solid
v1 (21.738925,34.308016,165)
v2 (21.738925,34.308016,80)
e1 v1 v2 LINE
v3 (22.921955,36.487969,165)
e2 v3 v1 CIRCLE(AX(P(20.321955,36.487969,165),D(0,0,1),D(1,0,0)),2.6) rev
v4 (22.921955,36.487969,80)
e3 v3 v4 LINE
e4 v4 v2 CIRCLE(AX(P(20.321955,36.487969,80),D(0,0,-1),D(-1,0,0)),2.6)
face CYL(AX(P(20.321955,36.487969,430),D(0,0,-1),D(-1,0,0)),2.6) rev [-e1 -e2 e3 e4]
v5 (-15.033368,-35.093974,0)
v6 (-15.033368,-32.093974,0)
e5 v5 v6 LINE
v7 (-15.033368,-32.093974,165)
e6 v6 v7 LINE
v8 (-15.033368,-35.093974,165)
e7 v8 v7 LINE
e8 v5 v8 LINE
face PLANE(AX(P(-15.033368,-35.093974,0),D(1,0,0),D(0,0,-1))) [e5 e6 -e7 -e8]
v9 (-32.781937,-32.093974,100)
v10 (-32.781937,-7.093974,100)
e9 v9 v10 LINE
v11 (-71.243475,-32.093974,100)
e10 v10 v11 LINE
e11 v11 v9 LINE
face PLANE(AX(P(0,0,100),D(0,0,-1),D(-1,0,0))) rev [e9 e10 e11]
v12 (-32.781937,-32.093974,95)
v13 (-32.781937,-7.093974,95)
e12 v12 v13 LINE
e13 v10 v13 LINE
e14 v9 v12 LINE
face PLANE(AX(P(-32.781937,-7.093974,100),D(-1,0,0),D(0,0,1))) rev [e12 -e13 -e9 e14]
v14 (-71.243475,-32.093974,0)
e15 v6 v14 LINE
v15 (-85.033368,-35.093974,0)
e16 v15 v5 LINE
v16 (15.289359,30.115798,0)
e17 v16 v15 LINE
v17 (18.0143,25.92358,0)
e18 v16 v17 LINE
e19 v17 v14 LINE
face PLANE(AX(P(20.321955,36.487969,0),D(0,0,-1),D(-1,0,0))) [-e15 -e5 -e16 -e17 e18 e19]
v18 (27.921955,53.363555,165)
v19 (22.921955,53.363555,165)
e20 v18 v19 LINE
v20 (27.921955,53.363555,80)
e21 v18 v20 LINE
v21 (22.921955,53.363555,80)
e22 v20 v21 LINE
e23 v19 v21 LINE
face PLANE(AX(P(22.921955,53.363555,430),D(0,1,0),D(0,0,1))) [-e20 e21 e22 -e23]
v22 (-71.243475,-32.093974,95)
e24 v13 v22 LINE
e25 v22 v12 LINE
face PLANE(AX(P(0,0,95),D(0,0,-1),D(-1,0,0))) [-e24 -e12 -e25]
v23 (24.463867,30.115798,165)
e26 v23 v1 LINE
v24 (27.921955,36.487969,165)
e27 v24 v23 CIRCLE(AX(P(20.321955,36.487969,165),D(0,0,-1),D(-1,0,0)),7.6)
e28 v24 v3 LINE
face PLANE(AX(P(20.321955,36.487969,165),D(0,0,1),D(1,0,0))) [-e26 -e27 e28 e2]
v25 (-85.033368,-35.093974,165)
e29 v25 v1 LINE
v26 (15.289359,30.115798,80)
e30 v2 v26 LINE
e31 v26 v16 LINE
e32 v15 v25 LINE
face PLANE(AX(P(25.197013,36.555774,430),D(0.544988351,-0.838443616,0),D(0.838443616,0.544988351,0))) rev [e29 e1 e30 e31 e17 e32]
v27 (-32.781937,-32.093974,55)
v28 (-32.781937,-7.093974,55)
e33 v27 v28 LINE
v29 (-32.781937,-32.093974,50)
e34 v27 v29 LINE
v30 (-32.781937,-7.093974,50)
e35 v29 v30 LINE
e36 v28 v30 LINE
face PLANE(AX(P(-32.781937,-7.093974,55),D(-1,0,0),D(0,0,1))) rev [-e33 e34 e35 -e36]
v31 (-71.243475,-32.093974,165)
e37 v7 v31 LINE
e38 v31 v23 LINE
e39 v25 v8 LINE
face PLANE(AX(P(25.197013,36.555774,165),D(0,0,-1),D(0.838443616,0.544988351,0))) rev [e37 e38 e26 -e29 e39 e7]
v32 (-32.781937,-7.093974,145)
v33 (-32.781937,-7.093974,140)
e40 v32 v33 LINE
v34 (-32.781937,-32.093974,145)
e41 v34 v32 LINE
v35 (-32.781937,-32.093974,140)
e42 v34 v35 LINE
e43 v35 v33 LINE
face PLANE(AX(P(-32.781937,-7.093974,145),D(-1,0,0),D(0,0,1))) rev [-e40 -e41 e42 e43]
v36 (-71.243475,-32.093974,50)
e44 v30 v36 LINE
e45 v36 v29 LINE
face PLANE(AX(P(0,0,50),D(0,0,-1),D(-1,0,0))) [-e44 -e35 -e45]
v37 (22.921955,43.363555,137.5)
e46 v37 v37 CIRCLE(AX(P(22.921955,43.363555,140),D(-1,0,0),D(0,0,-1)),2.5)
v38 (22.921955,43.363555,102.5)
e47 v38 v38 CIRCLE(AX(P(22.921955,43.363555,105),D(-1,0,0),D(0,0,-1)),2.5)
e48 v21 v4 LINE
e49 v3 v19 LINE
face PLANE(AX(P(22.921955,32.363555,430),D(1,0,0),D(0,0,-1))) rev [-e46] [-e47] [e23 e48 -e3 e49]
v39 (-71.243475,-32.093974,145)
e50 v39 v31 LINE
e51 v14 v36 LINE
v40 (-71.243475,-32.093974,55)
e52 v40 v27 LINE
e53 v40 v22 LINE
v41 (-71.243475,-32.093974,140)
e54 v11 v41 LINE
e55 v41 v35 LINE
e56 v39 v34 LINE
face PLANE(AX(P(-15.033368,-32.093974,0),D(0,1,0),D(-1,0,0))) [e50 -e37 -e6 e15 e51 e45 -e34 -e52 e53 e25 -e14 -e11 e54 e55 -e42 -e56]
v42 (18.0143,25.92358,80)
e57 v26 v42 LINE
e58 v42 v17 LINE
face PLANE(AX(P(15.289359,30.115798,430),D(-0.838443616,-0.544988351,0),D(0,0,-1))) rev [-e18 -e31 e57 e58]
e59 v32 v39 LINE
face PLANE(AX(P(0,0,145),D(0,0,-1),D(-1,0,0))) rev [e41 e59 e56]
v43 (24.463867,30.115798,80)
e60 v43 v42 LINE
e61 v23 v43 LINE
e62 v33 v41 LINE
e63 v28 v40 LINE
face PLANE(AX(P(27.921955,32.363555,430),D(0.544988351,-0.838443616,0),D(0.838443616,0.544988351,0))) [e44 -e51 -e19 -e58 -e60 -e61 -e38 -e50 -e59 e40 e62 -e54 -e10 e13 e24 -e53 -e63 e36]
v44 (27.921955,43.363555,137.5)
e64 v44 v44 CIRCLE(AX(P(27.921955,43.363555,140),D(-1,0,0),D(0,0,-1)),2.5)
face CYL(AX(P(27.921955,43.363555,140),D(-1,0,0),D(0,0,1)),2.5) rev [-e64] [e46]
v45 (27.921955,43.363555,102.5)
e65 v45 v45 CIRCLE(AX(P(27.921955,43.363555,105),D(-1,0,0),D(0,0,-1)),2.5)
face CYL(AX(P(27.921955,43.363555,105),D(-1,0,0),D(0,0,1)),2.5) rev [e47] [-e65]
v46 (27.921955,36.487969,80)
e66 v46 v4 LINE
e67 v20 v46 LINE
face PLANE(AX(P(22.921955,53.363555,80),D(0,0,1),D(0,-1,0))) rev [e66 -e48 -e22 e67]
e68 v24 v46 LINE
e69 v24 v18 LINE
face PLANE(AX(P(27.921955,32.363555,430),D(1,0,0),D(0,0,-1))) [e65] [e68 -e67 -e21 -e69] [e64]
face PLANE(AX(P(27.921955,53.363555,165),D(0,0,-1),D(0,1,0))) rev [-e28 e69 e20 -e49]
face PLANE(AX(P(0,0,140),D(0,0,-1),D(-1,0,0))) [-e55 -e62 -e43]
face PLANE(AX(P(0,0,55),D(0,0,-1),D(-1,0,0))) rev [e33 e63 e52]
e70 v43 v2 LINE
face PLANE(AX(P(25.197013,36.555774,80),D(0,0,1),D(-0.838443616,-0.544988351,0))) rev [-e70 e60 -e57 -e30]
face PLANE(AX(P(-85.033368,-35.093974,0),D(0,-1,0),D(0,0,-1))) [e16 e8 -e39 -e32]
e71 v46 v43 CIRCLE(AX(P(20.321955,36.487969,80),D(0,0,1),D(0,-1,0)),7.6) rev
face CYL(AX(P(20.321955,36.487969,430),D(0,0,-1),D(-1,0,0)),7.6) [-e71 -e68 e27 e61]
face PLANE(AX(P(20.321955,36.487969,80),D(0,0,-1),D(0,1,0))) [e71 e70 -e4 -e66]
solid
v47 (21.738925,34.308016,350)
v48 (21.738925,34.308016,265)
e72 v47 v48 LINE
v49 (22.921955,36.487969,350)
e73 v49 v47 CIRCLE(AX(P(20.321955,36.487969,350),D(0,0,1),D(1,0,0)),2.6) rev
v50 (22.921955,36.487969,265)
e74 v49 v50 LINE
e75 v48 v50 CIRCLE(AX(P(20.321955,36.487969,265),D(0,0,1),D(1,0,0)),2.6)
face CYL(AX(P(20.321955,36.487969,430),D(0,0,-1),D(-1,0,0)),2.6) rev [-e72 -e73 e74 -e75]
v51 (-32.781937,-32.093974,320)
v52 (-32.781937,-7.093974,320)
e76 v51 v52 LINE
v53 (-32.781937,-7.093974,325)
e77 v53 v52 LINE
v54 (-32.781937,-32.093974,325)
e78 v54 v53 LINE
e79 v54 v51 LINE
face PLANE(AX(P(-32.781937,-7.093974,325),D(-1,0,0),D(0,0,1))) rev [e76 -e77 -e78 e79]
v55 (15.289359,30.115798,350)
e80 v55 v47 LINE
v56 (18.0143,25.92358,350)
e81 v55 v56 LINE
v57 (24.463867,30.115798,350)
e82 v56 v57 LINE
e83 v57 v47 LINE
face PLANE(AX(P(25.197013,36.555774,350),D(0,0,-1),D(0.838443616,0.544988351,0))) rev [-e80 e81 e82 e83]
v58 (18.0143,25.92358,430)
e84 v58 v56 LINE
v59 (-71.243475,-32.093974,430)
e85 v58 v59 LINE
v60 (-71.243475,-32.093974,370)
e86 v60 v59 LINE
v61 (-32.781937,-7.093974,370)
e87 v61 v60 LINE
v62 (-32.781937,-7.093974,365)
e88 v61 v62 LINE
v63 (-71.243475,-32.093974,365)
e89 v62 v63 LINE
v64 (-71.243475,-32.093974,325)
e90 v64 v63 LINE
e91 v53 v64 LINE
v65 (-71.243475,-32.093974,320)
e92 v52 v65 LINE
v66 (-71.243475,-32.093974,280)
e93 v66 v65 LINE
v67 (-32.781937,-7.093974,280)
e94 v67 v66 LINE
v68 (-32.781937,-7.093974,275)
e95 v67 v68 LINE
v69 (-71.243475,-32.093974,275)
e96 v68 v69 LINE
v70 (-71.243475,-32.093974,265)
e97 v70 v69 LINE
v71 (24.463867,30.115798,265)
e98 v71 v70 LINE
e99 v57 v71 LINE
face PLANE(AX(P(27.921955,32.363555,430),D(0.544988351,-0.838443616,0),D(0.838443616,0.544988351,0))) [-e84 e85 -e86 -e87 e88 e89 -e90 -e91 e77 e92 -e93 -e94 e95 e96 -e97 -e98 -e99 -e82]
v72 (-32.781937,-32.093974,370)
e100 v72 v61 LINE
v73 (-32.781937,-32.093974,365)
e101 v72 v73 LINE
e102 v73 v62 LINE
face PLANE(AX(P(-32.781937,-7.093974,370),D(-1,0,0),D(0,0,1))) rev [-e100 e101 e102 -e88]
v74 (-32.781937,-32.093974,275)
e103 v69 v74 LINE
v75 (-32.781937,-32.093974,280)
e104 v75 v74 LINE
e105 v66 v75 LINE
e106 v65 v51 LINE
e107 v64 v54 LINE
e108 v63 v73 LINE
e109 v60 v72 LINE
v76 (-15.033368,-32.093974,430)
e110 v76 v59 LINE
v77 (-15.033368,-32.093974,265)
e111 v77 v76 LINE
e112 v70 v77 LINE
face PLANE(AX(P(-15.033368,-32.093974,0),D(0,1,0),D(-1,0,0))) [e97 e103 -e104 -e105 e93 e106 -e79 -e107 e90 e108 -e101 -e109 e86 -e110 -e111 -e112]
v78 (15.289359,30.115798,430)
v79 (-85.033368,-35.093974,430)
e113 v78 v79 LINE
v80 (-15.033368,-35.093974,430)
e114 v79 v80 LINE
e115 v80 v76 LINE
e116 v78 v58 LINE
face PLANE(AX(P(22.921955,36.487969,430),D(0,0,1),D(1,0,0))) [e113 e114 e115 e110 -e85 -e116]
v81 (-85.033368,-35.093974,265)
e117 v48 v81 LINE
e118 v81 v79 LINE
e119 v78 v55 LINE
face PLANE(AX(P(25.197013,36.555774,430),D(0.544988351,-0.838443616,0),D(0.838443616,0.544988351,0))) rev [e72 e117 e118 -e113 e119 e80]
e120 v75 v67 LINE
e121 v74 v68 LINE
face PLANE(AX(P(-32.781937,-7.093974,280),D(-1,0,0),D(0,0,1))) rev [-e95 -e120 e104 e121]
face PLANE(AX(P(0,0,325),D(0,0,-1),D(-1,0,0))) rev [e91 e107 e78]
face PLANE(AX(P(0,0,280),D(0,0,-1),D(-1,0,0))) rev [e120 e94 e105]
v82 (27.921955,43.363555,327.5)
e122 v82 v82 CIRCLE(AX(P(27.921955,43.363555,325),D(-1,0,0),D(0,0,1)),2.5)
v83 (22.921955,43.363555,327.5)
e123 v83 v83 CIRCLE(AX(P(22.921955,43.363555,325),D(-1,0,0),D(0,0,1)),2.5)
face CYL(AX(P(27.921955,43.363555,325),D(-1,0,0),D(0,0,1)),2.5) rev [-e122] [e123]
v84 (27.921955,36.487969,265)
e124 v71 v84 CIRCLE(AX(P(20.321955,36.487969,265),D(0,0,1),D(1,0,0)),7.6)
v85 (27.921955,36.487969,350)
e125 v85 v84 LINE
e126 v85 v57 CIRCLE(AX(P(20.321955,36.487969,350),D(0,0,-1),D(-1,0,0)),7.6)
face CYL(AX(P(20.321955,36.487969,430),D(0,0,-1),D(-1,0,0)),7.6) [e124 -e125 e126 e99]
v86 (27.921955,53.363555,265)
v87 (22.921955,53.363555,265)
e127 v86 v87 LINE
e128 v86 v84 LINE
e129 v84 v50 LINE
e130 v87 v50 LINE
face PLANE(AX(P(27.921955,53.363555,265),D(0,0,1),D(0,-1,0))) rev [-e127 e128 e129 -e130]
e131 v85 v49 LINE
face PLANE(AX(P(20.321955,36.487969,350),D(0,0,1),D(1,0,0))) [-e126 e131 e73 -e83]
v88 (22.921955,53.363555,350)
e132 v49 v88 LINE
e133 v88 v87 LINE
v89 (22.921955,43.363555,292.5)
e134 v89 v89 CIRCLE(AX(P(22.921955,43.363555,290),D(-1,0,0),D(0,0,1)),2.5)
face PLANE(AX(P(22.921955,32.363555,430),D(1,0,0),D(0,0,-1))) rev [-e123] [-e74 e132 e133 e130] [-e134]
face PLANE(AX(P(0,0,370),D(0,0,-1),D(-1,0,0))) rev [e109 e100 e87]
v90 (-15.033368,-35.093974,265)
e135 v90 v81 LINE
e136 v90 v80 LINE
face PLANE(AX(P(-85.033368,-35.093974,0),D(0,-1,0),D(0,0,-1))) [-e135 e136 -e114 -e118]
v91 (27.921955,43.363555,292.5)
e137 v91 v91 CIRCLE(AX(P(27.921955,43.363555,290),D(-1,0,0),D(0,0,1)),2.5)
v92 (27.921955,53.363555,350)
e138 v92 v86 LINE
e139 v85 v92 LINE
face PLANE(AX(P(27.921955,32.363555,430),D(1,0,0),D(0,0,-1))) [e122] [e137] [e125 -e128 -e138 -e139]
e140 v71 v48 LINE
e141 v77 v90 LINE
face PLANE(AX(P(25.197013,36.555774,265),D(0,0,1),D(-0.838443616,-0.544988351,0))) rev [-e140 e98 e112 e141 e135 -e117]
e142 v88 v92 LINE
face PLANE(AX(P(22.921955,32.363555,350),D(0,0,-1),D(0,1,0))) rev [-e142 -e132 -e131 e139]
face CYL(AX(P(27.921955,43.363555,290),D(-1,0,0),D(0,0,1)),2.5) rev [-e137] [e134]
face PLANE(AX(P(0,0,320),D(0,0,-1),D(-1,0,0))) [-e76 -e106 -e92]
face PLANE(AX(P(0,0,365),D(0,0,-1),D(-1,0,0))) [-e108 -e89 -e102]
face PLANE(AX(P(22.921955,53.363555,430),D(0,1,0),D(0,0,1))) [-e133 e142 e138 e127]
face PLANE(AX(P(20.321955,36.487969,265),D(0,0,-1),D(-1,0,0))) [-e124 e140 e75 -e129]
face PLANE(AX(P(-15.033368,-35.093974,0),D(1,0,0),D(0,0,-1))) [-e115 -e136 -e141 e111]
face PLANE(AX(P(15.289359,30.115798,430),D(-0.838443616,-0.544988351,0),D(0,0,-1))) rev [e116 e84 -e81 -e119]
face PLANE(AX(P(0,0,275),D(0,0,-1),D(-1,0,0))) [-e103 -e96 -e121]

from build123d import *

# Parameters (mm, degrees)
BASE_FLANGE2_DEPTH   = 430
CUT_EXTRUDE1_START   = 165
CUT_EXTRUDE1_DEPTH   = 100
CUT_EXTRUDE1_2_DEPTH = 80
CUT_EXTRUDE1_START_2 = 350
CUT_EXTRUDE1_3_DEPTH = 80
BOSS_EXTRUDE2_DEPTH  = 430
BOSS_EXTRUDE3_START  = 50
BOSS_EXTRUDE3_DEPTH  = 5
LPATTERN1_COUNT      = 8
LPATTERN1_PITCH      = 45
SKETCH13_R           = 2.5
CUT_EXTRUDE2_DEPTH   = 5
SKETCH14_W           = 88.914799092
SKETCH14_H           = 100
CUT_EXTRUDE3_DEPTH   = 440.40419449


# Read off the part's stored shape, not the designer's step: Cut-Extrude1
# Sheet-metal steps are written as plain solids
with BuildPart() as part:
    # Sketch1 → Base-Flange2 (new body)
    with BuildSketch(Plane.XY):
        with BuildLine():
            Line((27.921955125, 53.363555481), (27.921955125, 36.487969417))
            ThreePointArc((27.921955125, 36.487969417), (27.001720358, 32.862954046), (24.463866589, 30.115797933))
            Line((24.463866589, 30.115797933), (-72.078044875, -32.636444519))
            Line((-72.078044875, -32.636444519), (-74.802986628, -28.444226438))
            Line((-74.802986628, -28.444226438), (21.738924836, 34.308016014))
            ThreePointArc((21.738924836, 34.308016014), (22.607137968, 35.24783258), (22.921955125, 36.487969417))
            Line((22.921955125, 36.487969417), (22.921955125, 53.363555481))
            Line((22.921955125, 53.363555481), (27.921955125, 53.363555481))
        make_face()
    extrude(amount=BASE_FLANGE2_DEPTH)

    # Cut-Extrude1 outline → Cut-Extrude1 (cut)
    with BuildSketch(Plane.XY.offset(CUT_EXTRUDE1_START)):
        with BuildLine():
            Line((21.738924836, 34.308016014), (-10.483322138, 13.363555481))
            Line((-10.483322138, 13.363555481), (-7.758380385, 9.171337399))
            Line((-7.758380385, 9.171337399), (24.463866589, 30.115797933))
            ThreePointArc((24.463866589, 30.115797933), (27.001720358, 32.862954046), (27.921955125, 36.487969417))
            Line((27.921955125, 36.487969417), (27.921955125, 53.363555481))
            Line((27.921955125, 53.363555481), (22.921955125, 53.363555481))
            Line((22.921955125, 53.363555481), (22.921955125, 36.487969417))
            ThreePointArc((22.921955125, 36.487969417), (22.607137968, 35.247832579), (21.738924836, 34.308016014))
        make_face()
    extrude(amount=CUT_EXTRUDE1_DEPTH, mode=Mode.SUBTRACT)

    # Cut-Extrude1 2 outline → Cut-Extrude1 2 (cut)
    with BuildSketch(Plane.XY):
        with BuildLine():
            Line((21.738924836, 34.308016014), (15.289358557, 30.115797933))
            Line((15.289358557, 30.115797933), (18.01430031, 25.923579851))
            Line((18.01430031, 25.923579851), (24.463866589, 30.115797933))
            ThreePointArc((24.463866589, 30.115797933), (27.001720358, 32.862954046), (27.921955125, 36.487969417))
            Line((27.921955125, 36.487969417), (27.921955125, 53.363555481))
            Line((27.921955125, 53.363555481), (22.921955125, 53.363555481))
            Line((22.921955125, 53.363555481), (22.921955125, 36.487969417))
            ThreePointArc((22.921955125, 36.487969417), (22.607137968, 35.247832579), (21.738924836, 34.308016014))
        make_face()
    extrude(amount=CUT_EXTRUDE1_2_DEPTH, mode=Mode.SUBTRACT)

    # Cut-Extrude1 3 outline → Cut-Extrude1 3 (cut)
    with BuildSketch(Plane.XY.offset(CUT_EXTRUDE1_START_2)):
        with BuildLine():
            Line((21.738924836, 34.308016014), (15.289358557, 30.115797933))
            Line((15.289358557, 30.115797933), (18.01430031, 25.923579851))
            Line((18.01430031, 25.923579851), (24.463866589, 30.115797933))
            ThreePointArc((24.463866589, 30.115797933), (27.001720358, 32.862954046), (27.921955125, 36.487969417))
            Line((27.921955125, 36.487969417), (27.921955125, 53.363555481))
            Line((27.921955125, 53.363555481), (22.921955125, 53.363555481))
            Line((22.921955125, 53.363555481), (22.921955125, 36.487969417))
            ThreePointArc((22.921955125, 36.487969417), (22.607137968, 35.247832579), (21.738924836, 34.308016014))
        make_face()
    extrude(amount=CUT_EXTRUDE1_3_DEPTH, mode=Mode.SUBTRACT)

    # Sketch11 → Boss-Extrude2 (add)
    with BuildSketch(Plane.XY.offset(430)):
        Polygon((-74.802986628, -28.444226438), (-85.033367831, -35.09397422), (-15.033367831, -35.09397422), (-15.033367831, -32.09397422), (-71.243475184, -32.09397422), (-72.078044875, -32.636444519), align=None)
    extrude(amount=-BOSS_EXTRUDE2_DEPTH)

    # Sketch12 → Boss-Extrude3 (add)
    with BuildSketch(Plane.XY.offset(BOSS_EXTRUDE3_START)):
        Polygon((-32.781936722, -7.09397422), (-32.781936722, -32.09397422), (-71.243475184, -32.09397422), align=None)
    boss_extrude3 = extrude(amount=BOSS_EXTRUDE3_DEPTH)

    # LPattern1: Boss-Extrude3 ×8
    with Locations(*[(0, 0, i * LPATTERN1_PITCH) for i in range(1, LPATTERN1_COUNT)]):
        add(boss_extrude3)

    # Sketch13 → Cut-Extrude2 (cut)
    with BuildSketch(Plane.ZY.offset(-22.921955125)):
        with Locations((325, 43.363555481)):
            Circle(SKETCH13_R)
        with Locations((290, 43.363555481)):
            Circle(SKETCH13_R)
        with Locations(Location((140, 43.363555481, 0), (0, 0, 180))):
            Circle(SKETCH13_R)
        with Locations(Location((105, 43.363555481, 0), (0, 0, 180))):
            Circle(SKETCH13_R)
    extrude(amount=-CUT_EXTRUDE2_DEPTH, mode=Mode.SUBTRACT)

    # Sketch14 → Cut-Extrude3 (cut, through all)
    with BuildSketch(Plane(origin=(-9.220045459, 14.184685322, 0), x_dir=(0.8384436163006371, 0.5449883505954143, 0), z_dir=(-0.5449883505954142, 0.838443616300637, 0))):
        with Locations((-45.964092011, -215)):
            Rectangle(SKETCH14_W, SKETCH14_H)
    extrude(amount=-CUT_EXTRUDE3_DEPTH, mode=Mode.SUBTRACT)


with BuildPart() as cut_extrude3_piece_1:
    # of the separate pieces the step leaves, piece 1, a body of its own (cut_extrude3_pieces)
    add(part.part.solids().sort_by_distance((22.921955125, 53.363555481, 80))[0])


with BuildPart() as cut_extrude3_piece_2:
    # of the separate pieces the step leaves, piece 2, a body of its own (cut_extrude3_pieces)
    add(part.part.solids().sort_by_distance((21.738924836, 34.308016014, 265))[0])


solid = Compound([cut_extrude3_piece_1.part, cut_extrude3_piece_2.part])
